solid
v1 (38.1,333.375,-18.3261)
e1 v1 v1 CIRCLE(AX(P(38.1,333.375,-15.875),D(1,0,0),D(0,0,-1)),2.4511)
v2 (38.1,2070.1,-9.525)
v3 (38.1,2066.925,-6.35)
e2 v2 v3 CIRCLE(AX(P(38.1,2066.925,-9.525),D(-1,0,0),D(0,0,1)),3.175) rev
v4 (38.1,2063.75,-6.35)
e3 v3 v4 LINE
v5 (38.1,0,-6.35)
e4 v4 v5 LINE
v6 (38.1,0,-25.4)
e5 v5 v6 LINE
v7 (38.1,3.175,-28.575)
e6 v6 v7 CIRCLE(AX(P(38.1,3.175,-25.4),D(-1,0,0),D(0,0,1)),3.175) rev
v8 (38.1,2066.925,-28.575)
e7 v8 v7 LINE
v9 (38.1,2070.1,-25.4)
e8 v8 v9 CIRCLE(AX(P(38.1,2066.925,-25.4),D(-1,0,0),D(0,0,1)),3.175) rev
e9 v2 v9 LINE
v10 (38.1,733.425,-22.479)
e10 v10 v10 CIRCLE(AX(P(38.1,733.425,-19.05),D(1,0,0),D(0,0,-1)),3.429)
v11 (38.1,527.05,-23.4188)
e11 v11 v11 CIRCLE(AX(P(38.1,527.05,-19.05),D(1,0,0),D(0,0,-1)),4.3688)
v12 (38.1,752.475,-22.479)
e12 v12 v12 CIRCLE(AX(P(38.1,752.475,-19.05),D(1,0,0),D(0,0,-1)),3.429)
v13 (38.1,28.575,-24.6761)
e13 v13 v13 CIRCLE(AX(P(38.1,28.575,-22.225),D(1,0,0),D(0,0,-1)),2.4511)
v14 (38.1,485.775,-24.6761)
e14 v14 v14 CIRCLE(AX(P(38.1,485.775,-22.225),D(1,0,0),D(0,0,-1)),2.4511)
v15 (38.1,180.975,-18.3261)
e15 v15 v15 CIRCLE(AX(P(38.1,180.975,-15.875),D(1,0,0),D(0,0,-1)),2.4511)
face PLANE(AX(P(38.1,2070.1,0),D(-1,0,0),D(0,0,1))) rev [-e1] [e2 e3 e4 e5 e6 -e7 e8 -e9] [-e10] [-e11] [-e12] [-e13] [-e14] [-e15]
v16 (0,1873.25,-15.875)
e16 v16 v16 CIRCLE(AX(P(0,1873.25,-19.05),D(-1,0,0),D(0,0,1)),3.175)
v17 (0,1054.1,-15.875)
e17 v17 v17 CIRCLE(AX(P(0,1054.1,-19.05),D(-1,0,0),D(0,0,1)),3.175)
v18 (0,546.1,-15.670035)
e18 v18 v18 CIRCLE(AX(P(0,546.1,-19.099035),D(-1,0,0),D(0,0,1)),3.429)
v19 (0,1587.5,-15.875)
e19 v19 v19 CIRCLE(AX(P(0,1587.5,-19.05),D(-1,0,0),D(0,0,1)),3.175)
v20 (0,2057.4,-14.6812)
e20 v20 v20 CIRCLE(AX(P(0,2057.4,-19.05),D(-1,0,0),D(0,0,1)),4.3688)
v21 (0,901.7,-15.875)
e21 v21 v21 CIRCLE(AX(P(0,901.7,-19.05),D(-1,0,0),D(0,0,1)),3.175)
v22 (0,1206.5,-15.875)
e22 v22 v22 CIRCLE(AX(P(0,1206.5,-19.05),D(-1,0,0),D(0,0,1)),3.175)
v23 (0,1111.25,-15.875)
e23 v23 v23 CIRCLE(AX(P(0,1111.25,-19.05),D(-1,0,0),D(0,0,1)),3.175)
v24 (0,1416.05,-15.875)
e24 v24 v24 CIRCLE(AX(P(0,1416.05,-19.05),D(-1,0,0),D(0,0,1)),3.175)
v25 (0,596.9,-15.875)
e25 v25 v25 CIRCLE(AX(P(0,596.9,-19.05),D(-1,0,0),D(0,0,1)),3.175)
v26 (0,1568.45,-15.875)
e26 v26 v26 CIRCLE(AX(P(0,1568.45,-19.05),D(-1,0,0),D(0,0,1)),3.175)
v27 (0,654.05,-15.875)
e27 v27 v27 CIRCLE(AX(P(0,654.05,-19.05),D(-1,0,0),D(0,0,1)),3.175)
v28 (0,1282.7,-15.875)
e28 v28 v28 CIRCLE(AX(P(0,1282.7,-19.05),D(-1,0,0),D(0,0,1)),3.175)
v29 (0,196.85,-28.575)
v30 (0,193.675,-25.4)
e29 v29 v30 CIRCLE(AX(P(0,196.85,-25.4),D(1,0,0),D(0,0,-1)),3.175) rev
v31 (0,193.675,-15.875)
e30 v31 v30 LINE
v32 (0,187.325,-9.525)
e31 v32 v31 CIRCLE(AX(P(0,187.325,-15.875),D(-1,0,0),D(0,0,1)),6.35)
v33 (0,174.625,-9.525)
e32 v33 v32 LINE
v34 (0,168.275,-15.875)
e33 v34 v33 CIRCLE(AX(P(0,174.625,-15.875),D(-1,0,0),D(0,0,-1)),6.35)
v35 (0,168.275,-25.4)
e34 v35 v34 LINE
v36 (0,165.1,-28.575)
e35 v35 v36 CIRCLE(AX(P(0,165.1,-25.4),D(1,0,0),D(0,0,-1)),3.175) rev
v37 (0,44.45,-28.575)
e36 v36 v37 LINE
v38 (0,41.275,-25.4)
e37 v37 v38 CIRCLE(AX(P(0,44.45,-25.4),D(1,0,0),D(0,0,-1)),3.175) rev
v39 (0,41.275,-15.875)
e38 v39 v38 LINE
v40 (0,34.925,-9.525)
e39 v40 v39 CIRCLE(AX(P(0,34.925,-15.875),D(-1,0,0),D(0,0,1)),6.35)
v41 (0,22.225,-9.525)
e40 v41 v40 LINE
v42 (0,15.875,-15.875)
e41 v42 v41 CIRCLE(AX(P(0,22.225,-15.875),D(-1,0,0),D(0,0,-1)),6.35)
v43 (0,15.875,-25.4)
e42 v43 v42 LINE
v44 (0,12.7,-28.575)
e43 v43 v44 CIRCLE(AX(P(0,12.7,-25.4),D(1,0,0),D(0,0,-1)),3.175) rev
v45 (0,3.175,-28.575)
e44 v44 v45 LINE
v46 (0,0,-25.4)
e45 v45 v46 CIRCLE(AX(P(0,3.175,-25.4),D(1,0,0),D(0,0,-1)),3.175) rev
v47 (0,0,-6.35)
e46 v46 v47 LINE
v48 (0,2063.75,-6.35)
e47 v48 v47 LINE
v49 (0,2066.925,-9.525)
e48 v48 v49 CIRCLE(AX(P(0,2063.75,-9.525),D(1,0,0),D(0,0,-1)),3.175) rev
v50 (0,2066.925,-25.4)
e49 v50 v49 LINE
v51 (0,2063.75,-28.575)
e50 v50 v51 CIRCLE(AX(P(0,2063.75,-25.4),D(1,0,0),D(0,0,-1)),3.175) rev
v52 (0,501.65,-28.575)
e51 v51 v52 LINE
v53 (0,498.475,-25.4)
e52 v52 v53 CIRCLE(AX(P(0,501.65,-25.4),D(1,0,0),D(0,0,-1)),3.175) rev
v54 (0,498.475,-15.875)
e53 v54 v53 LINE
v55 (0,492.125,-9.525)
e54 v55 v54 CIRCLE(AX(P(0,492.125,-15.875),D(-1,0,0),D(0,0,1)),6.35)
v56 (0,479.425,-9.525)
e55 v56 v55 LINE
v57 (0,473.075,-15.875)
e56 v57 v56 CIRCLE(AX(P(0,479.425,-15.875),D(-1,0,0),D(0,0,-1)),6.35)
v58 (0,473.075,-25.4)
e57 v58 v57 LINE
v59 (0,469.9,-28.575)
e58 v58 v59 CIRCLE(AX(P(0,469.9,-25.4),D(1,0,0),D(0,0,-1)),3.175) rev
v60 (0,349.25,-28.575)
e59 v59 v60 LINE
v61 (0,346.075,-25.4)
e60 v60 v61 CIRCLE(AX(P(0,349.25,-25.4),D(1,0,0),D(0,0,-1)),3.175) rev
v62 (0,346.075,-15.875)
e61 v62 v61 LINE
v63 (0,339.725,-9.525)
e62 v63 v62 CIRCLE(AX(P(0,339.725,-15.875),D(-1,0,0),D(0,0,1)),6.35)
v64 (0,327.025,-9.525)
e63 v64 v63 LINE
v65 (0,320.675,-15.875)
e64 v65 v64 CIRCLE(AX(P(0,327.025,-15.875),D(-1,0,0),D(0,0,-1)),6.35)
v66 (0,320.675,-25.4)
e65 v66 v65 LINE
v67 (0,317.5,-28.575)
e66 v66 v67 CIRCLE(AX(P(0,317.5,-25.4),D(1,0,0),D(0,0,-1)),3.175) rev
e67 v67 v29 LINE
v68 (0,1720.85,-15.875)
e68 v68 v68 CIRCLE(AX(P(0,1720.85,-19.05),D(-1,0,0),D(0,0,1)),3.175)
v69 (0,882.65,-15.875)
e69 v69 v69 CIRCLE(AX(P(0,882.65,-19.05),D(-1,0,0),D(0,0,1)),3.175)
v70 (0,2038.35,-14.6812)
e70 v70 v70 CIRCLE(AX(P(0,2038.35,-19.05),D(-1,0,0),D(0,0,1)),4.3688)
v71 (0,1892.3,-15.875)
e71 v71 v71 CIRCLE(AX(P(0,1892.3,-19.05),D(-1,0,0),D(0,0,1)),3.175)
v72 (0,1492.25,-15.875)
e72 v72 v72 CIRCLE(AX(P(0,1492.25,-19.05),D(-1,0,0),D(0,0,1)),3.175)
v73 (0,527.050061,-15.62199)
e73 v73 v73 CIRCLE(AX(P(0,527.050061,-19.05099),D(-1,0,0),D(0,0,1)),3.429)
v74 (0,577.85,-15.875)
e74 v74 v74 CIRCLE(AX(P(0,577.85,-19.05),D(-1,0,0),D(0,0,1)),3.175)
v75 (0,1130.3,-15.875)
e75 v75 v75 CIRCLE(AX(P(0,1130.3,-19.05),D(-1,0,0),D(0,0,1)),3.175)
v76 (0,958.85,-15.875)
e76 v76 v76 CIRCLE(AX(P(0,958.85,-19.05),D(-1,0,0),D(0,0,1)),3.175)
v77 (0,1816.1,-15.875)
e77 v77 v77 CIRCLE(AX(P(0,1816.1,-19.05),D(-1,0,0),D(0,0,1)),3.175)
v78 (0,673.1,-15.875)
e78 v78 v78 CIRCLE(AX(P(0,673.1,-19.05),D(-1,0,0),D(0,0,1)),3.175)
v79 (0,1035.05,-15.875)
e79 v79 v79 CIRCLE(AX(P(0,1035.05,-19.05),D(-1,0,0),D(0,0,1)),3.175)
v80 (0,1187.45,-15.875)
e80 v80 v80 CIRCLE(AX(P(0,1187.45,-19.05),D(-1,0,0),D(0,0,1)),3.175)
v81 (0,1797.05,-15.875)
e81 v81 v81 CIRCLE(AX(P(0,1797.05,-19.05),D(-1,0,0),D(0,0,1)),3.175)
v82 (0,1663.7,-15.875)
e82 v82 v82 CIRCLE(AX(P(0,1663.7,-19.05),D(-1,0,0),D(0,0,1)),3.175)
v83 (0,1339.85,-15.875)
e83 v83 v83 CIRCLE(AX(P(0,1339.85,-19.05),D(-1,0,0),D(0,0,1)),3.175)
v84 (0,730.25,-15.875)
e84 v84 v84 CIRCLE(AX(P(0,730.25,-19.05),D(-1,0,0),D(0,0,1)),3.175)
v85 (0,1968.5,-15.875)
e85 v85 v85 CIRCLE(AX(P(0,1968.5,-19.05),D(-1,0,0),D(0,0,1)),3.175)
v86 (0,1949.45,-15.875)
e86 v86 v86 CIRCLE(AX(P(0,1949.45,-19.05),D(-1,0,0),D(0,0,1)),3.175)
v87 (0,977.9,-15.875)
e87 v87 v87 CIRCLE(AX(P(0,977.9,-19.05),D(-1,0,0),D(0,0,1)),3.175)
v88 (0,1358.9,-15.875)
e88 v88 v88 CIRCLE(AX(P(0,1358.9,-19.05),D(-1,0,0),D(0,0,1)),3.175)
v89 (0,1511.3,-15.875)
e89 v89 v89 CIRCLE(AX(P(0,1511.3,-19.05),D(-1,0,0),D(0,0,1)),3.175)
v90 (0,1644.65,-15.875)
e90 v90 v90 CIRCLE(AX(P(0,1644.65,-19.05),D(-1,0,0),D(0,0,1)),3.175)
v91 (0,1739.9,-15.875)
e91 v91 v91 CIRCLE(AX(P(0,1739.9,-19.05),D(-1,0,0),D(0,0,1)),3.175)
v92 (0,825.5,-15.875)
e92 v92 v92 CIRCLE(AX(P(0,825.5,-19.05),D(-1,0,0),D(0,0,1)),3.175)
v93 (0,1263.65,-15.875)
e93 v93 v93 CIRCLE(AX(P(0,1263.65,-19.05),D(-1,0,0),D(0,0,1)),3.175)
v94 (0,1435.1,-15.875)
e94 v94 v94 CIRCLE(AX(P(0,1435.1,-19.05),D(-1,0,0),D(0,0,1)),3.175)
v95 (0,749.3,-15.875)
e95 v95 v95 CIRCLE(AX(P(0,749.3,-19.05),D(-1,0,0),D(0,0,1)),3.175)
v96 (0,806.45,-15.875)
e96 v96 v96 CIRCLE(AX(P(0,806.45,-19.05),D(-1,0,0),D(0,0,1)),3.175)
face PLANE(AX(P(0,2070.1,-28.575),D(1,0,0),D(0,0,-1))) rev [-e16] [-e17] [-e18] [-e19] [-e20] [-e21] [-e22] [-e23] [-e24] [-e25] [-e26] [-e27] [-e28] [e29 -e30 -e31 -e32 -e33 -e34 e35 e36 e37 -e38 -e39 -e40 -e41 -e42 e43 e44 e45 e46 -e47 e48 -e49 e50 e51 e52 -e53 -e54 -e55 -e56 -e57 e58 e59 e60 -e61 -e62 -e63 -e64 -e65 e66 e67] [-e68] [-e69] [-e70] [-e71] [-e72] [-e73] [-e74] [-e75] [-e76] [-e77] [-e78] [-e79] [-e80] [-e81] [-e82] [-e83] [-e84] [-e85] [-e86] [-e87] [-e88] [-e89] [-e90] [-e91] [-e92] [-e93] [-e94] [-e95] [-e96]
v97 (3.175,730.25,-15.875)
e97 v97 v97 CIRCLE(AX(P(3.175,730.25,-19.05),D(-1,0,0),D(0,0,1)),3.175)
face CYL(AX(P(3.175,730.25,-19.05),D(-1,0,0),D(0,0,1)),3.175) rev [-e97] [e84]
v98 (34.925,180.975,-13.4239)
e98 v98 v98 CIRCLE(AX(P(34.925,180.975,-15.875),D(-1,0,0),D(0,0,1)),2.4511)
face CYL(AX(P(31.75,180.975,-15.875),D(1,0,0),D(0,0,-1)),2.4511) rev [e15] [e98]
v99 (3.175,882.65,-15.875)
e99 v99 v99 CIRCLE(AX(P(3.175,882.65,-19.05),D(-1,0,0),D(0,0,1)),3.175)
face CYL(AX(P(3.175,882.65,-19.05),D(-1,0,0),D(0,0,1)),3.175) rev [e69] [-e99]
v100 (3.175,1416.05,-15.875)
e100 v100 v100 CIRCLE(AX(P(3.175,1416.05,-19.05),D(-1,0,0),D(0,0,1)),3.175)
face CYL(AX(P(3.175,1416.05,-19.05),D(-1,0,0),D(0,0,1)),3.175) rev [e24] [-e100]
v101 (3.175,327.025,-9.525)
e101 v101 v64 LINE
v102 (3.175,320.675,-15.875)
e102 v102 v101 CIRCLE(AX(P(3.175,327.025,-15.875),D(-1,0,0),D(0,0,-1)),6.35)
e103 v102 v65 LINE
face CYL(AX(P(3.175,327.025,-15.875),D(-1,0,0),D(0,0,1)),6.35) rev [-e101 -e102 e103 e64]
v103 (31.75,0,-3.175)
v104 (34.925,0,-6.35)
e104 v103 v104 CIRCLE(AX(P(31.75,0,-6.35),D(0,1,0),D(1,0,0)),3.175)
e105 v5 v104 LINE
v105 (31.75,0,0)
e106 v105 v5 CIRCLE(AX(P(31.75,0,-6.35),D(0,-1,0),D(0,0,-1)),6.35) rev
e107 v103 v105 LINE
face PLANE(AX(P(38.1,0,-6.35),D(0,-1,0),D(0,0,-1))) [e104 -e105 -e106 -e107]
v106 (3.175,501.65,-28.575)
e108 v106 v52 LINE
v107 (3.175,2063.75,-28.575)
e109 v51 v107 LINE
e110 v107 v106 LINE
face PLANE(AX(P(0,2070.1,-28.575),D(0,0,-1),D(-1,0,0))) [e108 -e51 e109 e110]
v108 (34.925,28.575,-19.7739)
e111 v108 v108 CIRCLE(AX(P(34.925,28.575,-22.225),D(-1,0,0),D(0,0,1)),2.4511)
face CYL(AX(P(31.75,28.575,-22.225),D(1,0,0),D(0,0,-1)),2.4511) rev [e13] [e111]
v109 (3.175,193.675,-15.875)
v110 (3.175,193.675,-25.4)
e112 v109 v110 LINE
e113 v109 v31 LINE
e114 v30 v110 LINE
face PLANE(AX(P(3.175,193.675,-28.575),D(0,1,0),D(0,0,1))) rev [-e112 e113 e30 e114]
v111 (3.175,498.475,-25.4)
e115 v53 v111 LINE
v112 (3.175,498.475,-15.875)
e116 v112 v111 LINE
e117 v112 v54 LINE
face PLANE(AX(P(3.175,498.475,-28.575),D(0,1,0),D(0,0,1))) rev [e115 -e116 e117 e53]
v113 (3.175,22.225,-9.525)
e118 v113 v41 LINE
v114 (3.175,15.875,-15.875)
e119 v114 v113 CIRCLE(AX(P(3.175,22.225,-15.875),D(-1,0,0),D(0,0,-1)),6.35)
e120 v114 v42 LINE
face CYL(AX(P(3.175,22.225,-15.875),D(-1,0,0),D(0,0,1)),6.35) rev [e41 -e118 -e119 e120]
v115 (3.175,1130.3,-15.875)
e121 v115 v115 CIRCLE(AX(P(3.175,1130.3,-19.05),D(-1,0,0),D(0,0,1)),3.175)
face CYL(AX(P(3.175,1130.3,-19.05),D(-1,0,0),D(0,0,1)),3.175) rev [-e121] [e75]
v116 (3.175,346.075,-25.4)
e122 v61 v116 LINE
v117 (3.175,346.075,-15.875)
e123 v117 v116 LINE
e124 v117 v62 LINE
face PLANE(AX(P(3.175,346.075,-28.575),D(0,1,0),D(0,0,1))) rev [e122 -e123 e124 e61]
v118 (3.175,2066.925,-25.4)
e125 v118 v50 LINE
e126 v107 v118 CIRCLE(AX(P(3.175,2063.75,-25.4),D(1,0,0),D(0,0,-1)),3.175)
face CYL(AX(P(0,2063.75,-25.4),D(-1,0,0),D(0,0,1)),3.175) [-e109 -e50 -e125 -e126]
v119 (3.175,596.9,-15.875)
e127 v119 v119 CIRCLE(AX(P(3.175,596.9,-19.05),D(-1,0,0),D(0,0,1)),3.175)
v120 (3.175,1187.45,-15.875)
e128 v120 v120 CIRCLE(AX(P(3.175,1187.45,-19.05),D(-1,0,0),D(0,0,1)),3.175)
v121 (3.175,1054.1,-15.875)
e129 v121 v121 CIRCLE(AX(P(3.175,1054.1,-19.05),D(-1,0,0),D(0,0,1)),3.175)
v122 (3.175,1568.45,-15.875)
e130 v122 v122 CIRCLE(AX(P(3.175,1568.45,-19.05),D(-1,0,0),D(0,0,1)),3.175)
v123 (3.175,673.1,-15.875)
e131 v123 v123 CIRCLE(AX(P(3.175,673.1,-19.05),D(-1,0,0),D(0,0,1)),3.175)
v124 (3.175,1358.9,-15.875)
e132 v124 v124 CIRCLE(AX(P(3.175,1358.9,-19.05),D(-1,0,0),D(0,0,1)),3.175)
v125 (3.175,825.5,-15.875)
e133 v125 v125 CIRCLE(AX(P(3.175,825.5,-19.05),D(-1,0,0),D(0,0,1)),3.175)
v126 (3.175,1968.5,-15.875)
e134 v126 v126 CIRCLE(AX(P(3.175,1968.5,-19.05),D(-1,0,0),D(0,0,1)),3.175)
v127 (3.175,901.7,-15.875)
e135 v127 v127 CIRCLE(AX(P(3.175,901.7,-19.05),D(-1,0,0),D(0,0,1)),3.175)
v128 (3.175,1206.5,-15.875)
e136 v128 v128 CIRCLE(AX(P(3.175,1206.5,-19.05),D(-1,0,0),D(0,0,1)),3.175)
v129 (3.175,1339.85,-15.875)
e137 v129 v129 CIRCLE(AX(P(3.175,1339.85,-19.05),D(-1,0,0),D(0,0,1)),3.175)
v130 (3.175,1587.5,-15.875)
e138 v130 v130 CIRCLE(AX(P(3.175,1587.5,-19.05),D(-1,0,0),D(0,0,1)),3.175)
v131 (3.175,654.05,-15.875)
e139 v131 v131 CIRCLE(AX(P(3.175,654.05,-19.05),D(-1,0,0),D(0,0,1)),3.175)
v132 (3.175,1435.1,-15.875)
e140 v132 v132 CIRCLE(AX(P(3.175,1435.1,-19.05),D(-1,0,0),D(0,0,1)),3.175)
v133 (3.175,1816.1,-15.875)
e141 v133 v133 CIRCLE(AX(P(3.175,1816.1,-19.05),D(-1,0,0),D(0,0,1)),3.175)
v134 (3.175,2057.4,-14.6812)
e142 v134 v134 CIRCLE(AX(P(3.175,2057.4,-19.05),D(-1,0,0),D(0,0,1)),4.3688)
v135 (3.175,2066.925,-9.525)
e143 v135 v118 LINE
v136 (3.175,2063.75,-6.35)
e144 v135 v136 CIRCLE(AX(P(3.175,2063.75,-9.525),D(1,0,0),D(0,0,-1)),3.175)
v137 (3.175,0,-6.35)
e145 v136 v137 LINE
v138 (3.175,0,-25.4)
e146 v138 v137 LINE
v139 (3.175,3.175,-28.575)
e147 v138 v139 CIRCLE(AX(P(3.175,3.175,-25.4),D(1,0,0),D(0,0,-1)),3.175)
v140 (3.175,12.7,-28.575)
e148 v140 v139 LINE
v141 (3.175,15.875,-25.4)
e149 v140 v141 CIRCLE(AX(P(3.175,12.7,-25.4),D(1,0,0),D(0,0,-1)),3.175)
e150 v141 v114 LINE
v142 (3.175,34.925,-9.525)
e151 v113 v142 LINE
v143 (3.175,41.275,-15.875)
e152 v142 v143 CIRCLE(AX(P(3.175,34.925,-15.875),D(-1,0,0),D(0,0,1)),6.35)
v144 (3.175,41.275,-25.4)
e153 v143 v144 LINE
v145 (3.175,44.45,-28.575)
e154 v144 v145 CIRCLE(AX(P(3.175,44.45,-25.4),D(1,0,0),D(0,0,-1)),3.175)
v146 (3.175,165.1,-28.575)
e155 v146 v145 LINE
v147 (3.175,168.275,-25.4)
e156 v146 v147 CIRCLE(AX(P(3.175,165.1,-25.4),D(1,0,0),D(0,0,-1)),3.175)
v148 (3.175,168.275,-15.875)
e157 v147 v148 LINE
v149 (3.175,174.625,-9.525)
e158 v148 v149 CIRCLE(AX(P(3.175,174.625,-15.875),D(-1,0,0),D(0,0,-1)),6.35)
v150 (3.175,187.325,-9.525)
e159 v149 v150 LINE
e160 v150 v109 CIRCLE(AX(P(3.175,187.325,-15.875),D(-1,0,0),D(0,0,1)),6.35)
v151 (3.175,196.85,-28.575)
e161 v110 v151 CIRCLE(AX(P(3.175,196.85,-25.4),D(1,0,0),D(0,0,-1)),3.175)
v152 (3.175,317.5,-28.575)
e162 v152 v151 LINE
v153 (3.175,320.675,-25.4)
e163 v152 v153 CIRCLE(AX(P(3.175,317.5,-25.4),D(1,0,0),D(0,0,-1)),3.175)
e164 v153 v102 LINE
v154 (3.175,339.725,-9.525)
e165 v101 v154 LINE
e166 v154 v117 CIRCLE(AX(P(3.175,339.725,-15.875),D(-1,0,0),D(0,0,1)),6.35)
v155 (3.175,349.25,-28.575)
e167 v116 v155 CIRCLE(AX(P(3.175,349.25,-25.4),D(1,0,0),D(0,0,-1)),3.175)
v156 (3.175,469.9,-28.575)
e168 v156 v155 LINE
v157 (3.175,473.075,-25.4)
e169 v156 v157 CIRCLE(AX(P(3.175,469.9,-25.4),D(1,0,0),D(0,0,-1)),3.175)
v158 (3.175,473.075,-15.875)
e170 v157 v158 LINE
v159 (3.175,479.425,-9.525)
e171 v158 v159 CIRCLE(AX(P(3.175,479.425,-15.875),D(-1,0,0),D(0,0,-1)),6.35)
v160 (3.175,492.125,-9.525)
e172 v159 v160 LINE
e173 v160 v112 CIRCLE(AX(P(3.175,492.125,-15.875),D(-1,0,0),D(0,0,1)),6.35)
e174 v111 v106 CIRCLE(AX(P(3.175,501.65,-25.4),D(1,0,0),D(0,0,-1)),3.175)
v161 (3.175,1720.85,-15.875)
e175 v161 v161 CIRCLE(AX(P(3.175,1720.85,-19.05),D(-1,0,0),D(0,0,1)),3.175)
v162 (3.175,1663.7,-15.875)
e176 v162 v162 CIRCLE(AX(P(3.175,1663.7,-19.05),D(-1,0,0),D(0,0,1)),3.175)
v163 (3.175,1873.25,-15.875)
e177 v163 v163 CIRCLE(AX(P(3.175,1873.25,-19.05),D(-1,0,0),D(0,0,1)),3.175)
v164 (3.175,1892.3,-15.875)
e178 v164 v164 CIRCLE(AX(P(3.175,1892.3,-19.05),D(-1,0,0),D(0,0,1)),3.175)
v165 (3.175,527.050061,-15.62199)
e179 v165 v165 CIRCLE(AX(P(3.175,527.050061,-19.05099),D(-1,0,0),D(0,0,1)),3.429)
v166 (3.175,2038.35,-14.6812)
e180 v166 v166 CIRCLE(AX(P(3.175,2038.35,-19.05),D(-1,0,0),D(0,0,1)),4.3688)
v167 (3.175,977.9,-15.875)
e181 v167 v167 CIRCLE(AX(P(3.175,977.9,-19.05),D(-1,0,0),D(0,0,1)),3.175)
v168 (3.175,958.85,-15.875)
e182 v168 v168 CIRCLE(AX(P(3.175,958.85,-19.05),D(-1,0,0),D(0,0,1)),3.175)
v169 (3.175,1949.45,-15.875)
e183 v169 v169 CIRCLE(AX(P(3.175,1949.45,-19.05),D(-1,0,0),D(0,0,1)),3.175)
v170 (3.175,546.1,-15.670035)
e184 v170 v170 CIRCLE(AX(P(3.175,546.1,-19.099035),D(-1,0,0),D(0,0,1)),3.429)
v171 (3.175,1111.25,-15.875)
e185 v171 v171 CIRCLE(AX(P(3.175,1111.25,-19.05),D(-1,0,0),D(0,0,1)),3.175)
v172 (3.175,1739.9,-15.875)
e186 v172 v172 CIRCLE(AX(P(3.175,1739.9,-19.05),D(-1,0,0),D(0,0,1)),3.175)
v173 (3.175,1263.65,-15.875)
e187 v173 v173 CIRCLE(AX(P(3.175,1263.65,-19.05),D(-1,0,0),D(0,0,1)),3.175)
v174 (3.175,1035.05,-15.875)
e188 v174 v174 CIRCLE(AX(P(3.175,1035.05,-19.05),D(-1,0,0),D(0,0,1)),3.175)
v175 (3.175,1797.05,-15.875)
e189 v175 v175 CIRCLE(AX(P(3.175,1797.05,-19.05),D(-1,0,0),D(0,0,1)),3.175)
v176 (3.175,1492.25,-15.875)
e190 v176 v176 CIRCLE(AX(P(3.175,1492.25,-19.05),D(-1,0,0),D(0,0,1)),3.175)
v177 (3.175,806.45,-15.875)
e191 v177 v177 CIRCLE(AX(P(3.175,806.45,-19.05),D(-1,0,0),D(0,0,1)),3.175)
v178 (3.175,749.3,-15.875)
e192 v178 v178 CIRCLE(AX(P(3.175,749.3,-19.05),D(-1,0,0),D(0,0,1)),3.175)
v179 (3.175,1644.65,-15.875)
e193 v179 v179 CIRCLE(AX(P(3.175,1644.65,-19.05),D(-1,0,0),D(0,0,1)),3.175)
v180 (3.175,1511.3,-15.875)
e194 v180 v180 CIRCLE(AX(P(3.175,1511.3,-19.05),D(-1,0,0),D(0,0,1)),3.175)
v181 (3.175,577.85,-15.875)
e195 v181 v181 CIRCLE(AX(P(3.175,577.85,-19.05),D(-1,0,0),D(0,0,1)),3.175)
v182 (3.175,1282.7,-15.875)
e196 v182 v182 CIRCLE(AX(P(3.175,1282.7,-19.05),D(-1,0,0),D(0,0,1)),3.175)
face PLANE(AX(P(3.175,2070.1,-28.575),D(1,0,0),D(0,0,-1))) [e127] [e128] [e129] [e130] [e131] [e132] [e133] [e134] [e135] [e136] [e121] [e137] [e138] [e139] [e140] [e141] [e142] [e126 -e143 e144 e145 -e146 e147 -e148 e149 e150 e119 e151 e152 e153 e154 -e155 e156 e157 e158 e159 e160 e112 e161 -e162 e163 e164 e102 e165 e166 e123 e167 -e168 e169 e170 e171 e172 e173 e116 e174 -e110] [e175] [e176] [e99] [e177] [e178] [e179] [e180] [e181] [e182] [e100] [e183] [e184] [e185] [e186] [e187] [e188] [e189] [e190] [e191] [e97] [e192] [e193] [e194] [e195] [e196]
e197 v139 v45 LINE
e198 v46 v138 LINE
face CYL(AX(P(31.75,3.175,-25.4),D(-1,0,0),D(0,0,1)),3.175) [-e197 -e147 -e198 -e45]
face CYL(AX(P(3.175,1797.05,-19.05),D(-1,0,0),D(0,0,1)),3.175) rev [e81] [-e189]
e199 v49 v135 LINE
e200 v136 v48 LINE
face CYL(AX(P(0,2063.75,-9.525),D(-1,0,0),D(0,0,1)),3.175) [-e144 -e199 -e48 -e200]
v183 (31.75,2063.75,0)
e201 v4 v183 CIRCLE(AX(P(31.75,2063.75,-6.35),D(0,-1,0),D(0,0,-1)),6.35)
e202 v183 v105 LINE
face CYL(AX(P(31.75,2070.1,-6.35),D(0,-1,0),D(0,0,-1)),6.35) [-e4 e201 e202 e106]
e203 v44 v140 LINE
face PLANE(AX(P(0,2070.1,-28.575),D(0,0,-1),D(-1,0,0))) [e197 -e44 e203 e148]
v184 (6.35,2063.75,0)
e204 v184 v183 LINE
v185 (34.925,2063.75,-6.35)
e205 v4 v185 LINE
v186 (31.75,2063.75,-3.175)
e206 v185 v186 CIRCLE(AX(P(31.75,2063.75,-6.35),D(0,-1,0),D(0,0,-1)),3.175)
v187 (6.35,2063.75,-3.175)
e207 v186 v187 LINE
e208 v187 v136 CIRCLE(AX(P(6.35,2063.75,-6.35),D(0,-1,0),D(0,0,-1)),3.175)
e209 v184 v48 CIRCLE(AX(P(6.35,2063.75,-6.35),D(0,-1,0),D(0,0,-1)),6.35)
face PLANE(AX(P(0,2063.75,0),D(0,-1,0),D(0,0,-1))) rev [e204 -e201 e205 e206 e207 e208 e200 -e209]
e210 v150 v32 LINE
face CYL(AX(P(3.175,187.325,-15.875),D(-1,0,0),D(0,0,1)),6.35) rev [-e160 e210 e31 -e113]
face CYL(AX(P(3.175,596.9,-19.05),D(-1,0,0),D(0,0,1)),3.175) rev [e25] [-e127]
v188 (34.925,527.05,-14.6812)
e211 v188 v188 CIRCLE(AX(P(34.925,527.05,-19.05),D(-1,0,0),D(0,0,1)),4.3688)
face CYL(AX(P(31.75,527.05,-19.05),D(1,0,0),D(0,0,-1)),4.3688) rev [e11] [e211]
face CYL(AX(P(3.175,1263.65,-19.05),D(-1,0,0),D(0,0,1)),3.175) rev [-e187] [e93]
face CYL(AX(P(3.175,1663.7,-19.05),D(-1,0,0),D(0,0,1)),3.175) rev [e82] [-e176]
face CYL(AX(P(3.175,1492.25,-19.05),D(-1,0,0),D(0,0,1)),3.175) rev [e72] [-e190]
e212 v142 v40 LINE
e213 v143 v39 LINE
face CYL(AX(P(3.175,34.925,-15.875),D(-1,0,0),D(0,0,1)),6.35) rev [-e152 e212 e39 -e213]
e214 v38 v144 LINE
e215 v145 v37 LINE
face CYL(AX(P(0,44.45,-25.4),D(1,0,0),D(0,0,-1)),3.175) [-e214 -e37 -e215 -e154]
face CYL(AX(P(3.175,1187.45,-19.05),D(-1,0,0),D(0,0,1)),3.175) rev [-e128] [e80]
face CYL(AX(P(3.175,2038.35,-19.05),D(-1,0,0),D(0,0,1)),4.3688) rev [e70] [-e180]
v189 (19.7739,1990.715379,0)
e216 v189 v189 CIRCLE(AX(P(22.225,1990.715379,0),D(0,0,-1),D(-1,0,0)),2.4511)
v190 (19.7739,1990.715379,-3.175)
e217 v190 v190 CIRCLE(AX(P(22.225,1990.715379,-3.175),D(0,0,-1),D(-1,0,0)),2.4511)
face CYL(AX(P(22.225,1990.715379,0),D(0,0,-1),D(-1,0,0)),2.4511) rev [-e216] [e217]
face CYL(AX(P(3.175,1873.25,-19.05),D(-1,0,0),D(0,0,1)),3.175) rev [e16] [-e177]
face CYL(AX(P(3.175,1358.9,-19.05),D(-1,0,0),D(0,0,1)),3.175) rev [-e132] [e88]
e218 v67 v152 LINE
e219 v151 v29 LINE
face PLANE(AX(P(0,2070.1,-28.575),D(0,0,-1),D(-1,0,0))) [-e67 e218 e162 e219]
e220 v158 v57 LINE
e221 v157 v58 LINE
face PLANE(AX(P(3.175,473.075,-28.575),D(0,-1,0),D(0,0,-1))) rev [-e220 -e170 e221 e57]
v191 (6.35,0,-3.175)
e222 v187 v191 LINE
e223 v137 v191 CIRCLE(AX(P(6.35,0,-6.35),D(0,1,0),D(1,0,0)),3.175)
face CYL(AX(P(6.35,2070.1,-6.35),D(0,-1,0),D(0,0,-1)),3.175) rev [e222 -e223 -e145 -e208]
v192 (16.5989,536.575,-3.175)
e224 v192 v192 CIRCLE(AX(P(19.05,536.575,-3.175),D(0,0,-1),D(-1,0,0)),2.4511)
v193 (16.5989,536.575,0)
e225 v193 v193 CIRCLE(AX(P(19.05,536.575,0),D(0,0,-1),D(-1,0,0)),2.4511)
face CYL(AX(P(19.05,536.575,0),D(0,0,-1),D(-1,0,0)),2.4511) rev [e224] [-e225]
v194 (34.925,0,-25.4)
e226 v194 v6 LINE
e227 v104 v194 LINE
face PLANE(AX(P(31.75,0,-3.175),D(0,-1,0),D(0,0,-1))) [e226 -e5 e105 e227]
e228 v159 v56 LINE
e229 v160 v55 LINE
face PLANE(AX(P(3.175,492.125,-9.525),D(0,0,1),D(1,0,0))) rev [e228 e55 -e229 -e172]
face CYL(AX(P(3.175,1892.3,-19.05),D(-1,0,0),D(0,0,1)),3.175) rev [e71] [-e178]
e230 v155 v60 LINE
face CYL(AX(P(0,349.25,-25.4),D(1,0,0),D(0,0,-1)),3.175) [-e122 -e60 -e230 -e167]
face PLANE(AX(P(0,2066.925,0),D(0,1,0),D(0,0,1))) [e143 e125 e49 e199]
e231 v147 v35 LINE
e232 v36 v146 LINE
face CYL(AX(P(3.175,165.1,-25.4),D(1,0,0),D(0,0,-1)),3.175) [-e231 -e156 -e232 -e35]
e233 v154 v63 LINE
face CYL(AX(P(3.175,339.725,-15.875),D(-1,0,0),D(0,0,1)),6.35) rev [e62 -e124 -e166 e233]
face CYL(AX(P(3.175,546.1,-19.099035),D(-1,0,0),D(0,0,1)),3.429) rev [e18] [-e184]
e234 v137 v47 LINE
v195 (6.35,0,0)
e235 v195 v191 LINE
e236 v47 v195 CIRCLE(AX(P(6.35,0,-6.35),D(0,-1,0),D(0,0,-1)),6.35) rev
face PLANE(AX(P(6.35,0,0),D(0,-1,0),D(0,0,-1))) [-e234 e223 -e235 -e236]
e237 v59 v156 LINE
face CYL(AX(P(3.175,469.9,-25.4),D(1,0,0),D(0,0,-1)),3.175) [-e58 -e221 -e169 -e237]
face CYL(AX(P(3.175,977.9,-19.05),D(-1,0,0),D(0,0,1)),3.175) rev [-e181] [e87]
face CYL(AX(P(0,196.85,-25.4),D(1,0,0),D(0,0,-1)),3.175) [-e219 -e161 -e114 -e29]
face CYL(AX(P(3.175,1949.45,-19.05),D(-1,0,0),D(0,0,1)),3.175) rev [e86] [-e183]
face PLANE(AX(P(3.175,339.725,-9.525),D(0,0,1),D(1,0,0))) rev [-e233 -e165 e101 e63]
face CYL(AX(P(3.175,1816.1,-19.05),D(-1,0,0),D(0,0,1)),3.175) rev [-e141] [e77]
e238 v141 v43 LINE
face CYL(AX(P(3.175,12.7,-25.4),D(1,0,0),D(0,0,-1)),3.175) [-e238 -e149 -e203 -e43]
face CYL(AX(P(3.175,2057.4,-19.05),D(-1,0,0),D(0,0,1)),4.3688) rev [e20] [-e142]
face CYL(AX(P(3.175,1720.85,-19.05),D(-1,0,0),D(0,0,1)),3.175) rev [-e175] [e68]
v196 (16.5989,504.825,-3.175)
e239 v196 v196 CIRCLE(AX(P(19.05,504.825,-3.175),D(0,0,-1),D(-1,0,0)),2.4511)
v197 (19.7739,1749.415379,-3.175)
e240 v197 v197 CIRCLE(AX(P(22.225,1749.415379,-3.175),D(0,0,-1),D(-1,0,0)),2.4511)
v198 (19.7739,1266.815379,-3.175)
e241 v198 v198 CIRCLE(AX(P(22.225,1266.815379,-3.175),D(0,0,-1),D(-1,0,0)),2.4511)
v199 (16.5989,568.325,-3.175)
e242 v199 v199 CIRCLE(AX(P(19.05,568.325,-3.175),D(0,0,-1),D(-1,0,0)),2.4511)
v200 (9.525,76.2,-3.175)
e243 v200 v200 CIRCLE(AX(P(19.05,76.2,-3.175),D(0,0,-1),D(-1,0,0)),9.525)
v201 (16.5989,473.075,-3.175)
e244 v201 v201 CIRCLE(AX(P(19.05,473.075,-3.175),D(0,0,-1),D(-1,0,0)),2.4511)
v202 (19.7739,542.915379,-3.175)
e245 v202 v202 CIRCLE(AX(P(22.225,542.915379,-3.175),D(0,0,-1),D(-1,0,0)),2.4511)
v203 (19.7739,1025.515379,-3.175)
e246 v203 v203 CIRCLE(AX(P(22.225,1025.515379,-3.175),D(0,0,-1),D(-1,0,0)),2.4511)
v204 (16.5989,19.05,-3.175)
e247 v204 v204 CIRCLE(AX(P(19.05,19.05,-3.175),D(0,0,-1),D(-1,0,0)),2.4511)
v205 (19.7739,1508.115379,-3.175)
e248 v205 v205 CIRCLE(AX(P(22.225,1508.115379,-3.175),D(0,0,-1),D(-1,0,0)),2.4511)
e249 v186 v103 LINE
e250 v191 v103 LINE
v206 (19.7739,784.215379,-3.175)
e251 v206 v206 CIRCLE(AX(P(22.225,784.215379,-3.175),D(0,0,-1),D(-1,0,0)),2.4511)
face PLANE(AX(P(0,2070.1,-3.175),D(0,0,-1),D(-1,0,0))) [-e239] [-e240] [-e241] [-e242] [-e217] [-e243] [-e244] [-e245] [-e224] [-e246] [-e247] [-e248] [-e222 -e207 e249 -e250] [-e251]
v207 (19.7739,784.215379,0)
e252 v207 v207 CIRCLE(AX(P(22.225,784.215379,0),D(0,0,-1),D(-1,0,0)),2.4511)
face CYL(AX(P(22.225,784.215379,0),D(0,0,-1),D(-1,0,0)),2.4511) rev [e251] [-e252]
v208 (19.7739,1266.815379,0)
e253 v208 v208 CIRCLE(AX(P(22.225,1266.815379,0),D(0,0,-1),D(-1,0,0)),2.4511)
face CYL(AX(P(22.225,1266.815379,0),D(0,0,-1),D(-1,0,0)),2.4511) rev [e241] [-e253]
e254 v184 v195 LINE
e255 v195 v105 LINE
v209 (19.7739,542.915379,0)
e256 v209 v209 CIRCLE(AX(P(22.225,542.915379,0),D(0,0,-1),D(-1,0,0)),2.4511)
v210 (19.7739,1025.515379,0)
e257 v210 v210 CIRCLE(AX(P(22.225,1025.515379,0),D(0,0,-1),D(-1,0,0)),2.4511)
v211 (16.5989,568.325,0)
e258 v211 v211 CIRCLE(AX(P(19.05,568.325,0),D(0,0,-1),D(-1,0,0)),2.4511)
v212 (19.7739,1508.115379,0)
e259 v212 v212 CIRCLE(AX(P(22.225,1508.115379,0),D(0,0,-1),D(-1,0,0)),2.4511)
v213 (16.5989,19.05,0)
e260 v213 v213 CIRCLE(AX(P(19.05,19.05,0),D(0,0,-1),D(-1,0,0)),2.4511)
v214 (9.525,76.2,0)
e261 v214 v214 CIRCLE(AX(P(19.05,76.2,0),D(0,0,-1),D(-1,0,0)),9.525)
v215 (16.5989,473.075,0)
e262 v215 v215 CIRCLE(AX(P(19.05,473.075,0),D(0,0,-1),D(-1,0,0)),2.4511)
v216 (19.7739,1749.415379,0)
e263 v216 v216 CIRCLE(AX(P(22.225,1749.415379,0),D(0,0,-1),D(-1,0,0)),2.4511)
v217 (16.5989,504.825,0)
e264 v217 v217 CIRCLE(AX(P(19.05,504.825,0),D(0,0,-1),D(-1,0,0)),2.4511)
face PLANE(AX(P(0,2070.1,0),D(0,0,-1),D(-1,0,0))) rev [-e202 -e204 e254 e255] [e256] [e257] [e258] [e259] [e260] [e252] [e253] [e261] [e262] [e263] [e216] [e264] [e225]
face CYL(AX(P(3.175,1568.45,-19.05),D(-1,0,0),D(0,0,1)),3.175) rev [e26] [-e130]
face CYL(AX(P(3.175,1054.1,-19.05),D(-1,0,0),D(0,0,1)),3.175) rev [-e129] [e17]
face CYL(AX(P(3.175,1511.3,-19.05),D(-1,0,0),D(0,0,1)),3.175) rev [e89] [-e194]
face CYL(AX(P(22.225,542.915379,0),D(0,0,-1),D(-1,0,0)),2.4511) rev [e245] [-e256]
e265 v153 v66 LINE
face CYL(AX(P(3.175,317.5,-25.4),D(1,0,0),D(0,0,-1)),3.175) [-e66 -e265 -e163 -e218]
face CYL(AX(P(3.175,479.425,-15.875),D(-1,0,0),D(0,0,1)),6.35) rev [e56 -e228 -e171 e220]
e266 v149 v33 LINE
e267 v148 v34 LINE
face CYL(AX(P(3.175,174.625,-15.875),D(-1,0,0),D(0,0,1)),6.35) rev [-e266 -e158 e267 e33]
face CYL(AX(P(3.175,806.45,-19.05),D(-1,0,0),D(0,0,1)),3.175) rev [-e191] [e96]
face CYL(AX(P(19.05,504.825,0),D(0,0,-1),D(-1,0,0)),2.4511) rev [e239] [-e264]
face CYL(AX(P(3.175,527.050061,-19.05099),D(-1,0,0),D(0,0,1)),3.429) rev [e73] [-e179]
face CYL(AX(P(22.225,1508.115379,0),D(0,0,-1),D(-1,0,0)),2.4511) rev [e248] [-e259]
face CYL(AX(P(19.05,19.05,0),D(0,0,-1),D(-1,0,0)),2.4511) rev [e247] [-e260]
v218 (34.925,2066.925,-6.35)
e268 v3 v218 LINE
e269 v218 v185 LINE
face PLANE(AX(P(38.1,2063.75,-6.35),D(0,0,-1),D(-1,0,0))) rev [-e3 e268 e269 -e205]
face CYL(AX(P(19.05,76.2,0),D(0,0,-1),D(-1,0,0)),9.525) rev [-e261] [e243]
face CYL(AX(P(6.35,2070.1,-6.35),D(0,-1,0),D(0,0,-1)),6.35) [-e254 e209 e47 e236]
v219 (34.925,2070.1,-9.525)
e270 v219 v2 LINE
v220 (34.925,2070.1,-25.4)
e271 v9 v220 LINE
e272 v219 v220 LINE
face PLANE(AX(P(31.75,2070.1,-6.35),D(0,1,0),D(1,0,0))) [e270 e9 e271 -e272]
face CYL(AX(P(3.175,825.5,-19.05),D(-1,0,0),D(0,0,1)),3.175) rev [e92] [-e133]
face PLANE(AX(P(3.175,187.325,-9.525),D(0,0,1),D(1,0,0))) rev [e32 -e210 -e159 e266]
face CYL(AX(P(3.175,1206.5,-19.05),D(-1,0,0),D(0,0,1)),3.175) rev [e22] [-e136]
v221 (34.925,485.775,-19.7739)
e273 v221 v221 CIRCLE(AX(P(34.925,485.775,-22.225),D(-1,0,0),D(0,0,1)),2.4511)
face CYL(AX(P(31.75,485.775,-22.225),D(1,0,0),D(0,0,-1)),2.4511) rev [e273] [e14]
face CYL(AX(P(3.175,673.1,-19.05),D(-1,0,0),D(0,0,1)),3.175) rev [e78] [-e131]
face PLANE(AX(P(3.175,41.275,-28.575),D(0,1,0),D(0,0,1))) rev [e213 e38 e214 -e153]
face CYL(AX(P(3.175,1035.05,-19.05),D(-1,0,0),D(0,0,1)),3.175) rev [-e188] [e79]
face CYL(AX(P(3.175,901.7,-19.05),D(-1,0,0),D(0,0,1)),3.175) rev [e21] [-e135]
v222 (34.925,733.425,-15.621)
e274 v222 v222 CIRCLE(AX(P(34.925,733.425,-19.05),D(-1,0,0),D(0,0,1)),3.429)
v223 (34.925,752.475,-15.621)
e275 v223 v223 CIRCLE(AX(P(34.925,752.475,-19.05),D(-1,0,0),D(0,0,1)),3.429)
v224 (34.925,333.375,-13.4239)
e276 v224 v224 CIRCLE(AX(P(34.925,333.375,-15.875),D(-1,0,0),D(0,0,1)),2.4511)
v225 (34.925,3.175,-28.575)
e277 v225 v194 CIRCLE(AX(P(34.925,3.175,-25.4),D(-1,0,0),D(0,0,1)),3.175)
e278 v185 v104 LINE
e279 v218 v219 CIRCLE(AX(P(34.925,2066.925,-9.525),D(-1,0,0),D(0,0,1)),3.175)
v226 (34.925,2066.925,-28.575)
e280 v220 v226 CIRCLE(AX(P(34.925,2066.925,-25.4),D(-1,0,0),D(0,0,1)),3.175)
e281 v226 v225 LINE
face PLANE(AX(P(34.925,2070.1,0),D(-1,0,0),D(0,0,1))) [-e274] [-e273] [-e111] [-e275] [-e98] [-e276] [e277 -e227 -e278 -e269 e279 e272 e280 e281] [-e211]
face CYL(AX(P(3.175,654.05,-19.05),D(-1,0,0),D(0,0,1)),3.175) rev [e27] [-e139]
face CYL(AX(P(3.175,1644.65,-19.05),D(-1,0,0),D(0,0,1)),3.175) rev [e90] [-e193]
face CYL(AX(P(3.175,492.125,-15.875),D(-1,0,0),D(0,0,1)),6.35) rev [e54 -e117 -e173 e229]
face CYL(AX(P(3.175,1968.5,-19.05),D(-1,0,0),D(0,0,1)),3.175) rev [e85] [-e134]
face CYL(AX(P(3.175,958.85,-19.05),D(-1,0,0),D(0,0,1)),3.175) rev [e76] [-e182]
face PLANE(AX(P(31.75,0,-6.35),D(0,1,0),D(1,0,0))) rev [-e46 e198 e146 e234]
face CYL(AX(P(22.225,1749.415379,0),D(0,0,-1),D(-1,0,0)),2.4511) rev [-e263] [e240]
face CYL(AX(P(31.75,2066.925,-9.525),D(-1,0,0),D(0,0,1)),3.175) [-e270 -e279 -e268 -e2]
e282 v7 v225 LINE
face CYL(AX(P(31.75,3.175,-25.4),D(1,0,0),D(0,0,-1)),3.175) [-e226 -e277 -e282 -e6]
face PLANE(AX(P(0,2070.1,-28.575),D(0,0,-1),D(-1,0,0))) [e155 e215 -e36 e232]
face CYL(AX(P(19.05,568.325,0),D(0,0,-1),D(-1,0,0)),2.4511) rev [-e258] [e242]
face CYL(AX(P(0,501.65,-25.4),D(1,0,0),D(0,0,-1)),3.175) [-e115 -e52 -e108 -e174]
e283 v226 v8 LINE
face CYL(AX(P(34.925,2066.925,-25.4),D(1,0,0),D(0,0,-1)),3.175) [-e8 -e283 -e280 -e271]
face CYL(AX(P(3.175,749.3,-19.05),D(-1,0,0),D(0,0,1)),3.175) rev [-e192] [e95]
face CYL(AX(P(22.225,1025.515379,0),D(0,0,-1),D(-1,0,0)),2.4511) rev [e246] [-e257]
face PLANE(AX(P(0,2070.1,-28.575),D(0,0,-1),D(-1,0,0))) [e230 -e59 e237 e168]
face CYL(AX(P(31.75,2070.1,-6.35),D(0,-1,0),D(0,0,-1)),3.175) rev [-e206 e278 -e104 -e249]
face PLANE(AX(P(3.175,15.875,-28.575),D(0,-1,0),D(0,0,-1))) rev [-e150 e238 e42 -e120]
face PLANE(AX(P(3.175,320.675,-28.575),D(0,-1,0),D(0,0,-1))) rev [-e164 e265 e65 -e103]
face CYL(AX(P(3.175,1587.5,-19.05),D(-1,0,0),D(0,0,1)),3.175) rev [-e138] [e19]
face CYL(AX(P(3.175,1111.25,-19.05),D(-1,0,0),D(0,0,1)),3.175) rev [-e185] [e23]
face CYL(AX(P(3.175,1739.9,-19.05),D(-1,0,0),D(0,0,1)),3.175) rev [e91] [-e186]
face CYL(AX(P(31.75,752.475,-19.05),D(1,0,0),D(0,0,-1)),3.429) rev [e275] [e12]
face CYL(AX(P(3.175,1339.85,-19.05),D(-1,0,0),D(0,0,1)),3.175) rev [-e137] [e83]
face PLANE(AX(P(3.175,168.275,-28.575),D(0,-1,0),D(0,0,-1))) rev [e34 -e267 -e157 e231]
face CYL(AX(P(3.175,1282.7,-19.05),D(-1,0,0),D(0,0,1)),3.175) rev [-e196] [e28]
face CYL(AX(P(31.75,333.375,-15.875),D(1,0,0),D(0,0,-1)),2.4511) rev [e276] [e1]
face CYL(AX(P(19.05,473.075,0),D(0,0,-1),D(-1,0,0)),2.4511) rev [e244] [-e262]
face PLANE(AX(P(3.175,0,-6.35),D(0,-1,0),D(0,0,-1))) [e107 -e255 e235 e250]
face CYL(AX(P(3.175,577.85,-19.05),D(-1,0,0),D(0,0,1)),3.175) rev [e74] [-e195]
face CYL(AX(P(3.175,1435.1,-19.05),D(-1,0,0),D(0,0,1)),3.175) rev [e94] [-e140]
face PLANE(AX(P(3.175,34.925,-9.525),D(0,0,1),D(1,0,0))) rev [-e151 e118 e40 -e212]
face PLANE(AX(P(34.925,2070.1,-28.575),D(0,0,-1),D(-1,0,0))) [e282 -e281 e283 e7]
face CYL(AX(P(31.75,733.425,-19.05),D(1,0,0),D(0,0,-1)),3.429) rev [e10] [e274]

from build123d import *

# Parameters (mm, degrees)
BASE_FLANGE1_DEPTH = 2070.1
SKETCH6_R          = 2.4511
SKETCH6_R_2        = 4.3688
SKETCH6_R_3        = 3.429
CUT_EXTRUDE1_DEPTH = 6.35
SKETCH7_R          = 2.4511
SKETCH7_R_2        = 9.525
CUT_EXTRUDE2_DEPTH = 3.175
SKETCH8_R          = 3.175
SKETCH8_R_2        = 4.3688
SKETCH8_R_3        = 3.429
CUT_EXTRUDE3_DEPTH = 3.175
SKETCH9_W          = 38.1
SKETCH9_H          = 6.35
CUT_EXTRUDE4_DEPTH = 6.35
SKETCH10_W         = 3.175
SKETCH10_H         = 22.225
CUT_EXTRUDE5_DEPTH = 3.175
FILLET1_R          = 3.175


# Sheet-metal steps are written as plain solids
with BuildPart() as part:
    # Sketch1 → Base-Flange1 (new body)
    with BuildSketch(Plane(origin=(0, 0, 0), x_dir=(1, 0, 0), z_dir=(0, 1, 0))):
        with BuildLine():
            Line((0, 28.575), (0, 6.35))
            ThreePointArc((0, 6.35), (1.859871939, 1.859871939), (6.35, 0))
            Line((6.35, 0), (31.75, 0))
            ThreePointArc((31.75, 0), (36.240128061, 1.859871939), (38.1, 6.35))
            Line((38.1, 6.35), (38.1, 28.575))
            Line((38.1, 28.575), (34.925, 28.575))
            Line((34.925, 28.575), (34.925, 6.35))
            ThreePointArc((34.925, 6.35), (33.99506403, 4.10493597), (31.75, 3.175))
            Line((31.75, 3.175), (6.35, 3.175))
            ThreePointArc((6.35, 3.175), (4.10493597, 4.10493597), (3.175, 6.35))
            Line((3.175, 6.35), (3.175, 28.575))
            Line((3.175, 28.575), (0, 28.575))
        make_face()
    extrude(amount=BASE_FLANGE1_DEPTH)

    # Sketch6 → Cut-Extrude1 (cut)
    with BuildSketch(Plane(origin=(38.1, 0, 0), x_dir=(0, 0, -1), z_dir=(1, 0, 0))):
        with Locations((22.225, 28.575)):
            Circle(SKETCH6_R)
        with Locations((22.225, 485.775)):
            Circle(SKETCH6_R)
        with Locations((19.05, 527.05)):
            Circle(SKETCH6_R_2)
        with Locations((19.05, 752.475)):
            Circle(SKETCH6_R_3)
        with Locations((19.05, 733.425)):
            Circle(SKETCH6_R_3)
        with Locations((15.875, 180.975)):
            Circle(SKETCH6_R)
        with Locations((15.875, 333.375)):
            Circle(SKETCH6_R)
    extrude(amount=-CUT_EXTRUDE1_DEPTH, mode=Mode.SUBTRACT)

    # Sketch7 → Cut-Extrude2 (cut)
    with BuildSketch(Plane(origin=(0, 0, -3.175), x_dir=(-1, 0, 0), z_dir=(0, 0, -1))):
        with Locations((-19.05, 19.05)):
            Circle(SKETCH7_R)
        with Locations((-22.225, 542.9153787)):
            Circle(SKETCH7_R)
        with Locations((-22.225, 784.2153787)):
            Circle(SKETCH7_R)
        with Locations((-22.225, 1025.5153787)):
            Circle(SKETCH7_R)
        with Locations((-22.225, 1266.8153787)):
            Circle(SKETCH7_R)
        with Locations((-22.225, 1508.1153787)):
            Circle(SKETCH7_R)
        with Locations((-22.225, 1749.4153787)):
            Circle(SKETCH7_R)
        with Locations((-22.225, 1990.7153787)):
            Circle(SKETCH7_R)
        with Locations((-19.05, 473.075)):
            Circle(SKETCH7_R)
        with Locations((-19.05, 504.825)):
            Circle(SKETCH7_R)
        with Locations((-19.05, 536.575)):
            Circle(SKETCH7_R)
        with Locations((-19.05, 568.325)):
            Circle(SKETCH7_R)
        with Locations((-19.05, 76.2)):
            Circle(SKETCH7_R_2)
    extrude(amount=-CUT_EXTRUDE2_DEPTH, mode=Mode.SUBTRACT)

    # Sketch8 → Cut-Extrude3 (cut)
    with BuildSketch(Plane.ZY):
        with Locations((-19.05, 1968.5)):
            Circle(SKETCH8_R)
        with Locations((-19.05, 1949.45)):
            Circle(SKETCH8_R)
        with Locations((-19.05, 1892.3)):
            Circle(SKETCH8_R)
        with Locations((-19.05, 1873.25)):
            Circle(SKETCH8_R)
        with Locations((-19.05, 1816.1)):
            Circle(SKETCH8_R)
        with Locations((-19.05, 1797.05)):
            Circle(SKETCH8_R)
        with Locations((-19.05, 1739.9)):
            Circle(SKETCH8_R)
        with Locations((-19.05, 1720.85)):
            Circle(SKETCH8_R)
        with Locations((-19.05, 1663.7)):
            Circle(SKETCH8_R)
        with Locations((-19.05, 1644.65)):
            Circle(SKETCH8_R)
        with Locations((-19.05, 1587.5)):
            Circle(SKETCH8_R)
        with Locations((-19.05, 1568.45)):
            Circle(SKETCH8_R)
        with Locations((-19.05, 1511.3)):
            Circle(SKETCH8_R)
        with Locations((-19.05, 1492.25)):
            Circle(SKETCH8_R)
        with Locations((-19.05, 1435.1)):
            Circle(SKETCH8_R)
        with Locations((-19.05, 1416.05)):
            Circle(SKETCH8_R)
        with Locations((-19.05, 1358.9)):
            Circle(SKETCH8_R)
        with Locations((-19.05, 1339.85)):
            Circle(SKETCH8_R)
        with Locations((-19.05, 1282.7)):
            Circle(SKETCH8_R)
        with Locations((-19.05, 1263.65)):
            Circle(SKETCH8_R)
        with Locations((-19.05, 1206.5)):
            Circle(SKETCH8_R)
        with Locations((-19.05, 1187.45)):
            Circle(SKETCH8_R)
        with Locations((-19.05, 1130.3)):
            Circle(SKETCH8_R)
        with Locations((-19.05, 1111.25)):
            Circle(SKETCH8_R)
        with Locations((-19.05, 1054.1)):
            Circle(SKETCH8_R)
        with Locations((-19.05, 1035.05)):
            Circle(SKETCH8_R)
        with Locations((-19.05, 977.9)):
            Circle(SKETCH8_R)
        with Locations((-19.05, 958.85)):
            Circle(SKETCH8_R)
        with Locations((-19.05, 901.7)):
            Circle(SKETCH8_R)
        with Locations((-19.05, 882.65)):
            Circle(SKETCH8_R)
        with Locations((-19.05, 825.5)):
            Circle(SKETCH8_R)
        with Locations((-19.05, 806.45)):
            Circle(SKETCH8_R)
        with Locations((-19.05, 749.3)):
            Circle(SKETCH8_R)
        with Locations((-19.05, 730.25)):
            Circle(SKETCH8_R)
        with Locations((-19.05, 673.1)):
            Circle(SKETCH8_R)
        with Locations((-19.05, 654.05)):
            Circle(SKETCH8_R)
        with Locations((-19.05, 596.9)):
            Circle(SKETCH8_R)
        with Locations((-19.05, 577.85)):
            Circle(SKETCH8_R)
        with Locations((-19.05, 2057.4)):
            Circle(SKETCH8_R_2)
        with Locations((-19.05, 2038.35)):
            Circle(SKETCH8_R_2)
        with Locations((-19.099035462, 546.1)):
            Circle(SKETCH8_R_3)
        with Locations((-19.050989584, 527.050060588)):
            Circle(SKETCH8_R_3)
        with BuildLine():
            Line((-28.575, 41.275), (-15.875, 41.275))
            ThreePointArc((-15.875, 41.275), (-11.384871939, 39.415128061), (-9.525, 34.925))
            Line((-9.525, 34.925), (-9.525, 22.225))
            ThreePointArc((-9.525, 22.225), (-11.384871939, 17.734871939), (-15.875, 15.875))
            Line((-15.875, 15.875), (-28.575, 15.875))
            Line((-28.575, 15.875), (-28.575, 41.275))
        make_face()
        with BuildLine():
            Line((-28.575, 193.675), (-15.875, 193.675))
            ThreePointArc((-15.875, 193.675), (-11.384871939, 191.815128061), (-9.525, 187.325))
            Line((-9.525, 187.325), (-9.525, 174.625))
            ThreePointArc((-9.525, 174.625), (-11.384871939, 170.134871939), (-15.875, 168.275))
            Line((-15.875, 168.275), (-28.575, 168.275))
            Line((-28.575, 168.275), (-28.575, 193.675))
        make_face()
        with BuildLine():
            Line((-28.575, 346.075), (-15.875, 346.075))
            ThreePointArc((-15.875, 346.075), (-11.384871939, 344.215128061), (-9.525, 339.725))
            Line((-9.525, 339.725), (-9.525, 327.025))
            ThreePointArc((-9.525, 327.025), (-11.384871939, 322.534871939), (-15.875, 320.675))
            Line((-15.875, 320.675), (-28.575, 320.675))
            Line((-28.575, 320.675), (-28.575, 346.075))
        make_face()
        with BuildLine():
            Line((-28.575, 498.475), (-15.875, 498.475))
            ThreePointArc((-15.875, 498.475), (-11.384871939, 496.615128061), (-9.525, 492.125))
            Line((-9.525, 492.125), (-9.525, 479.425))
            ThreePointArc((-9.525, 479.425), (-11.384871939, 474.934871939), (-15.875, 473.075))
            Line((-15.875, 473.075), (-28.575, 473.075))
            Line((-28.575, 473.075), (-28.575, 498.475))
        make_face()
    extrude(amount=-CUT_EXTRUDE3_DEPTH, mode=Mode.SUBTRACT)

    # Sketch9 → Cut-Extrude4 (cut)
    with BuildSketch(Plane(origin=(0, 2070.1, 0), x_dir=(1, 0, 0), z_dir=(0, 1, 0))):
        with Locations((19.05, 3.175)):
            Rectangle(SKETCH9_W, SKETCH9_H)
    extrude(amount=-CUT_EXTRUDE4_DEPTH, mode=Mode.SUBTRACT)

    # Sketch10 → Cut-Extrude5 (cut)
    with BuildSketch(Plane(origin=(0, 2070.1, 0), x_dir=(1, 0, 0), z_dir=(0, 1, 0))):
        with Locations((1.5875, 17.4625)):
            Rectangle(SKETCH10_W, SKETCH10_H)
    extrude(amount=-CUT_EXTRUDE5_DEPTH, mode=Mode.SUBTRACT)

    # Fillet1
    fillet1_edges = [part.edges().sort_by_distance(p)[0] for p in [
        (1.5875, 498.475, -28.575),
        (1.5875, 473.075, -28.575),
        (1.5875, 346.075, -28.575),
        (1.5875, 320.675, -28.575),
        (1.5875, 193.675, -28.575),
        (1.5875, 168.275, -28.575),
        (1.5875, 41.275, -28.575),
        (1.5875, 15.875, -28.575),
        (1.5875, 0, -28.575),
        (36.5125, 0, -28.575),
        (36.5125, 2070.1, -6.35),
        (1.5875, 2066.925, -6.35),
        (36.5125, 2070.1, -28.575),
        (1.5875, 2066.925, -28.575),
    ]]
    fillet(fillet1_edges, radius=FILLET1_R - 0.0001)  # a hair under: the kernel refuses the full size


solid = part.part
